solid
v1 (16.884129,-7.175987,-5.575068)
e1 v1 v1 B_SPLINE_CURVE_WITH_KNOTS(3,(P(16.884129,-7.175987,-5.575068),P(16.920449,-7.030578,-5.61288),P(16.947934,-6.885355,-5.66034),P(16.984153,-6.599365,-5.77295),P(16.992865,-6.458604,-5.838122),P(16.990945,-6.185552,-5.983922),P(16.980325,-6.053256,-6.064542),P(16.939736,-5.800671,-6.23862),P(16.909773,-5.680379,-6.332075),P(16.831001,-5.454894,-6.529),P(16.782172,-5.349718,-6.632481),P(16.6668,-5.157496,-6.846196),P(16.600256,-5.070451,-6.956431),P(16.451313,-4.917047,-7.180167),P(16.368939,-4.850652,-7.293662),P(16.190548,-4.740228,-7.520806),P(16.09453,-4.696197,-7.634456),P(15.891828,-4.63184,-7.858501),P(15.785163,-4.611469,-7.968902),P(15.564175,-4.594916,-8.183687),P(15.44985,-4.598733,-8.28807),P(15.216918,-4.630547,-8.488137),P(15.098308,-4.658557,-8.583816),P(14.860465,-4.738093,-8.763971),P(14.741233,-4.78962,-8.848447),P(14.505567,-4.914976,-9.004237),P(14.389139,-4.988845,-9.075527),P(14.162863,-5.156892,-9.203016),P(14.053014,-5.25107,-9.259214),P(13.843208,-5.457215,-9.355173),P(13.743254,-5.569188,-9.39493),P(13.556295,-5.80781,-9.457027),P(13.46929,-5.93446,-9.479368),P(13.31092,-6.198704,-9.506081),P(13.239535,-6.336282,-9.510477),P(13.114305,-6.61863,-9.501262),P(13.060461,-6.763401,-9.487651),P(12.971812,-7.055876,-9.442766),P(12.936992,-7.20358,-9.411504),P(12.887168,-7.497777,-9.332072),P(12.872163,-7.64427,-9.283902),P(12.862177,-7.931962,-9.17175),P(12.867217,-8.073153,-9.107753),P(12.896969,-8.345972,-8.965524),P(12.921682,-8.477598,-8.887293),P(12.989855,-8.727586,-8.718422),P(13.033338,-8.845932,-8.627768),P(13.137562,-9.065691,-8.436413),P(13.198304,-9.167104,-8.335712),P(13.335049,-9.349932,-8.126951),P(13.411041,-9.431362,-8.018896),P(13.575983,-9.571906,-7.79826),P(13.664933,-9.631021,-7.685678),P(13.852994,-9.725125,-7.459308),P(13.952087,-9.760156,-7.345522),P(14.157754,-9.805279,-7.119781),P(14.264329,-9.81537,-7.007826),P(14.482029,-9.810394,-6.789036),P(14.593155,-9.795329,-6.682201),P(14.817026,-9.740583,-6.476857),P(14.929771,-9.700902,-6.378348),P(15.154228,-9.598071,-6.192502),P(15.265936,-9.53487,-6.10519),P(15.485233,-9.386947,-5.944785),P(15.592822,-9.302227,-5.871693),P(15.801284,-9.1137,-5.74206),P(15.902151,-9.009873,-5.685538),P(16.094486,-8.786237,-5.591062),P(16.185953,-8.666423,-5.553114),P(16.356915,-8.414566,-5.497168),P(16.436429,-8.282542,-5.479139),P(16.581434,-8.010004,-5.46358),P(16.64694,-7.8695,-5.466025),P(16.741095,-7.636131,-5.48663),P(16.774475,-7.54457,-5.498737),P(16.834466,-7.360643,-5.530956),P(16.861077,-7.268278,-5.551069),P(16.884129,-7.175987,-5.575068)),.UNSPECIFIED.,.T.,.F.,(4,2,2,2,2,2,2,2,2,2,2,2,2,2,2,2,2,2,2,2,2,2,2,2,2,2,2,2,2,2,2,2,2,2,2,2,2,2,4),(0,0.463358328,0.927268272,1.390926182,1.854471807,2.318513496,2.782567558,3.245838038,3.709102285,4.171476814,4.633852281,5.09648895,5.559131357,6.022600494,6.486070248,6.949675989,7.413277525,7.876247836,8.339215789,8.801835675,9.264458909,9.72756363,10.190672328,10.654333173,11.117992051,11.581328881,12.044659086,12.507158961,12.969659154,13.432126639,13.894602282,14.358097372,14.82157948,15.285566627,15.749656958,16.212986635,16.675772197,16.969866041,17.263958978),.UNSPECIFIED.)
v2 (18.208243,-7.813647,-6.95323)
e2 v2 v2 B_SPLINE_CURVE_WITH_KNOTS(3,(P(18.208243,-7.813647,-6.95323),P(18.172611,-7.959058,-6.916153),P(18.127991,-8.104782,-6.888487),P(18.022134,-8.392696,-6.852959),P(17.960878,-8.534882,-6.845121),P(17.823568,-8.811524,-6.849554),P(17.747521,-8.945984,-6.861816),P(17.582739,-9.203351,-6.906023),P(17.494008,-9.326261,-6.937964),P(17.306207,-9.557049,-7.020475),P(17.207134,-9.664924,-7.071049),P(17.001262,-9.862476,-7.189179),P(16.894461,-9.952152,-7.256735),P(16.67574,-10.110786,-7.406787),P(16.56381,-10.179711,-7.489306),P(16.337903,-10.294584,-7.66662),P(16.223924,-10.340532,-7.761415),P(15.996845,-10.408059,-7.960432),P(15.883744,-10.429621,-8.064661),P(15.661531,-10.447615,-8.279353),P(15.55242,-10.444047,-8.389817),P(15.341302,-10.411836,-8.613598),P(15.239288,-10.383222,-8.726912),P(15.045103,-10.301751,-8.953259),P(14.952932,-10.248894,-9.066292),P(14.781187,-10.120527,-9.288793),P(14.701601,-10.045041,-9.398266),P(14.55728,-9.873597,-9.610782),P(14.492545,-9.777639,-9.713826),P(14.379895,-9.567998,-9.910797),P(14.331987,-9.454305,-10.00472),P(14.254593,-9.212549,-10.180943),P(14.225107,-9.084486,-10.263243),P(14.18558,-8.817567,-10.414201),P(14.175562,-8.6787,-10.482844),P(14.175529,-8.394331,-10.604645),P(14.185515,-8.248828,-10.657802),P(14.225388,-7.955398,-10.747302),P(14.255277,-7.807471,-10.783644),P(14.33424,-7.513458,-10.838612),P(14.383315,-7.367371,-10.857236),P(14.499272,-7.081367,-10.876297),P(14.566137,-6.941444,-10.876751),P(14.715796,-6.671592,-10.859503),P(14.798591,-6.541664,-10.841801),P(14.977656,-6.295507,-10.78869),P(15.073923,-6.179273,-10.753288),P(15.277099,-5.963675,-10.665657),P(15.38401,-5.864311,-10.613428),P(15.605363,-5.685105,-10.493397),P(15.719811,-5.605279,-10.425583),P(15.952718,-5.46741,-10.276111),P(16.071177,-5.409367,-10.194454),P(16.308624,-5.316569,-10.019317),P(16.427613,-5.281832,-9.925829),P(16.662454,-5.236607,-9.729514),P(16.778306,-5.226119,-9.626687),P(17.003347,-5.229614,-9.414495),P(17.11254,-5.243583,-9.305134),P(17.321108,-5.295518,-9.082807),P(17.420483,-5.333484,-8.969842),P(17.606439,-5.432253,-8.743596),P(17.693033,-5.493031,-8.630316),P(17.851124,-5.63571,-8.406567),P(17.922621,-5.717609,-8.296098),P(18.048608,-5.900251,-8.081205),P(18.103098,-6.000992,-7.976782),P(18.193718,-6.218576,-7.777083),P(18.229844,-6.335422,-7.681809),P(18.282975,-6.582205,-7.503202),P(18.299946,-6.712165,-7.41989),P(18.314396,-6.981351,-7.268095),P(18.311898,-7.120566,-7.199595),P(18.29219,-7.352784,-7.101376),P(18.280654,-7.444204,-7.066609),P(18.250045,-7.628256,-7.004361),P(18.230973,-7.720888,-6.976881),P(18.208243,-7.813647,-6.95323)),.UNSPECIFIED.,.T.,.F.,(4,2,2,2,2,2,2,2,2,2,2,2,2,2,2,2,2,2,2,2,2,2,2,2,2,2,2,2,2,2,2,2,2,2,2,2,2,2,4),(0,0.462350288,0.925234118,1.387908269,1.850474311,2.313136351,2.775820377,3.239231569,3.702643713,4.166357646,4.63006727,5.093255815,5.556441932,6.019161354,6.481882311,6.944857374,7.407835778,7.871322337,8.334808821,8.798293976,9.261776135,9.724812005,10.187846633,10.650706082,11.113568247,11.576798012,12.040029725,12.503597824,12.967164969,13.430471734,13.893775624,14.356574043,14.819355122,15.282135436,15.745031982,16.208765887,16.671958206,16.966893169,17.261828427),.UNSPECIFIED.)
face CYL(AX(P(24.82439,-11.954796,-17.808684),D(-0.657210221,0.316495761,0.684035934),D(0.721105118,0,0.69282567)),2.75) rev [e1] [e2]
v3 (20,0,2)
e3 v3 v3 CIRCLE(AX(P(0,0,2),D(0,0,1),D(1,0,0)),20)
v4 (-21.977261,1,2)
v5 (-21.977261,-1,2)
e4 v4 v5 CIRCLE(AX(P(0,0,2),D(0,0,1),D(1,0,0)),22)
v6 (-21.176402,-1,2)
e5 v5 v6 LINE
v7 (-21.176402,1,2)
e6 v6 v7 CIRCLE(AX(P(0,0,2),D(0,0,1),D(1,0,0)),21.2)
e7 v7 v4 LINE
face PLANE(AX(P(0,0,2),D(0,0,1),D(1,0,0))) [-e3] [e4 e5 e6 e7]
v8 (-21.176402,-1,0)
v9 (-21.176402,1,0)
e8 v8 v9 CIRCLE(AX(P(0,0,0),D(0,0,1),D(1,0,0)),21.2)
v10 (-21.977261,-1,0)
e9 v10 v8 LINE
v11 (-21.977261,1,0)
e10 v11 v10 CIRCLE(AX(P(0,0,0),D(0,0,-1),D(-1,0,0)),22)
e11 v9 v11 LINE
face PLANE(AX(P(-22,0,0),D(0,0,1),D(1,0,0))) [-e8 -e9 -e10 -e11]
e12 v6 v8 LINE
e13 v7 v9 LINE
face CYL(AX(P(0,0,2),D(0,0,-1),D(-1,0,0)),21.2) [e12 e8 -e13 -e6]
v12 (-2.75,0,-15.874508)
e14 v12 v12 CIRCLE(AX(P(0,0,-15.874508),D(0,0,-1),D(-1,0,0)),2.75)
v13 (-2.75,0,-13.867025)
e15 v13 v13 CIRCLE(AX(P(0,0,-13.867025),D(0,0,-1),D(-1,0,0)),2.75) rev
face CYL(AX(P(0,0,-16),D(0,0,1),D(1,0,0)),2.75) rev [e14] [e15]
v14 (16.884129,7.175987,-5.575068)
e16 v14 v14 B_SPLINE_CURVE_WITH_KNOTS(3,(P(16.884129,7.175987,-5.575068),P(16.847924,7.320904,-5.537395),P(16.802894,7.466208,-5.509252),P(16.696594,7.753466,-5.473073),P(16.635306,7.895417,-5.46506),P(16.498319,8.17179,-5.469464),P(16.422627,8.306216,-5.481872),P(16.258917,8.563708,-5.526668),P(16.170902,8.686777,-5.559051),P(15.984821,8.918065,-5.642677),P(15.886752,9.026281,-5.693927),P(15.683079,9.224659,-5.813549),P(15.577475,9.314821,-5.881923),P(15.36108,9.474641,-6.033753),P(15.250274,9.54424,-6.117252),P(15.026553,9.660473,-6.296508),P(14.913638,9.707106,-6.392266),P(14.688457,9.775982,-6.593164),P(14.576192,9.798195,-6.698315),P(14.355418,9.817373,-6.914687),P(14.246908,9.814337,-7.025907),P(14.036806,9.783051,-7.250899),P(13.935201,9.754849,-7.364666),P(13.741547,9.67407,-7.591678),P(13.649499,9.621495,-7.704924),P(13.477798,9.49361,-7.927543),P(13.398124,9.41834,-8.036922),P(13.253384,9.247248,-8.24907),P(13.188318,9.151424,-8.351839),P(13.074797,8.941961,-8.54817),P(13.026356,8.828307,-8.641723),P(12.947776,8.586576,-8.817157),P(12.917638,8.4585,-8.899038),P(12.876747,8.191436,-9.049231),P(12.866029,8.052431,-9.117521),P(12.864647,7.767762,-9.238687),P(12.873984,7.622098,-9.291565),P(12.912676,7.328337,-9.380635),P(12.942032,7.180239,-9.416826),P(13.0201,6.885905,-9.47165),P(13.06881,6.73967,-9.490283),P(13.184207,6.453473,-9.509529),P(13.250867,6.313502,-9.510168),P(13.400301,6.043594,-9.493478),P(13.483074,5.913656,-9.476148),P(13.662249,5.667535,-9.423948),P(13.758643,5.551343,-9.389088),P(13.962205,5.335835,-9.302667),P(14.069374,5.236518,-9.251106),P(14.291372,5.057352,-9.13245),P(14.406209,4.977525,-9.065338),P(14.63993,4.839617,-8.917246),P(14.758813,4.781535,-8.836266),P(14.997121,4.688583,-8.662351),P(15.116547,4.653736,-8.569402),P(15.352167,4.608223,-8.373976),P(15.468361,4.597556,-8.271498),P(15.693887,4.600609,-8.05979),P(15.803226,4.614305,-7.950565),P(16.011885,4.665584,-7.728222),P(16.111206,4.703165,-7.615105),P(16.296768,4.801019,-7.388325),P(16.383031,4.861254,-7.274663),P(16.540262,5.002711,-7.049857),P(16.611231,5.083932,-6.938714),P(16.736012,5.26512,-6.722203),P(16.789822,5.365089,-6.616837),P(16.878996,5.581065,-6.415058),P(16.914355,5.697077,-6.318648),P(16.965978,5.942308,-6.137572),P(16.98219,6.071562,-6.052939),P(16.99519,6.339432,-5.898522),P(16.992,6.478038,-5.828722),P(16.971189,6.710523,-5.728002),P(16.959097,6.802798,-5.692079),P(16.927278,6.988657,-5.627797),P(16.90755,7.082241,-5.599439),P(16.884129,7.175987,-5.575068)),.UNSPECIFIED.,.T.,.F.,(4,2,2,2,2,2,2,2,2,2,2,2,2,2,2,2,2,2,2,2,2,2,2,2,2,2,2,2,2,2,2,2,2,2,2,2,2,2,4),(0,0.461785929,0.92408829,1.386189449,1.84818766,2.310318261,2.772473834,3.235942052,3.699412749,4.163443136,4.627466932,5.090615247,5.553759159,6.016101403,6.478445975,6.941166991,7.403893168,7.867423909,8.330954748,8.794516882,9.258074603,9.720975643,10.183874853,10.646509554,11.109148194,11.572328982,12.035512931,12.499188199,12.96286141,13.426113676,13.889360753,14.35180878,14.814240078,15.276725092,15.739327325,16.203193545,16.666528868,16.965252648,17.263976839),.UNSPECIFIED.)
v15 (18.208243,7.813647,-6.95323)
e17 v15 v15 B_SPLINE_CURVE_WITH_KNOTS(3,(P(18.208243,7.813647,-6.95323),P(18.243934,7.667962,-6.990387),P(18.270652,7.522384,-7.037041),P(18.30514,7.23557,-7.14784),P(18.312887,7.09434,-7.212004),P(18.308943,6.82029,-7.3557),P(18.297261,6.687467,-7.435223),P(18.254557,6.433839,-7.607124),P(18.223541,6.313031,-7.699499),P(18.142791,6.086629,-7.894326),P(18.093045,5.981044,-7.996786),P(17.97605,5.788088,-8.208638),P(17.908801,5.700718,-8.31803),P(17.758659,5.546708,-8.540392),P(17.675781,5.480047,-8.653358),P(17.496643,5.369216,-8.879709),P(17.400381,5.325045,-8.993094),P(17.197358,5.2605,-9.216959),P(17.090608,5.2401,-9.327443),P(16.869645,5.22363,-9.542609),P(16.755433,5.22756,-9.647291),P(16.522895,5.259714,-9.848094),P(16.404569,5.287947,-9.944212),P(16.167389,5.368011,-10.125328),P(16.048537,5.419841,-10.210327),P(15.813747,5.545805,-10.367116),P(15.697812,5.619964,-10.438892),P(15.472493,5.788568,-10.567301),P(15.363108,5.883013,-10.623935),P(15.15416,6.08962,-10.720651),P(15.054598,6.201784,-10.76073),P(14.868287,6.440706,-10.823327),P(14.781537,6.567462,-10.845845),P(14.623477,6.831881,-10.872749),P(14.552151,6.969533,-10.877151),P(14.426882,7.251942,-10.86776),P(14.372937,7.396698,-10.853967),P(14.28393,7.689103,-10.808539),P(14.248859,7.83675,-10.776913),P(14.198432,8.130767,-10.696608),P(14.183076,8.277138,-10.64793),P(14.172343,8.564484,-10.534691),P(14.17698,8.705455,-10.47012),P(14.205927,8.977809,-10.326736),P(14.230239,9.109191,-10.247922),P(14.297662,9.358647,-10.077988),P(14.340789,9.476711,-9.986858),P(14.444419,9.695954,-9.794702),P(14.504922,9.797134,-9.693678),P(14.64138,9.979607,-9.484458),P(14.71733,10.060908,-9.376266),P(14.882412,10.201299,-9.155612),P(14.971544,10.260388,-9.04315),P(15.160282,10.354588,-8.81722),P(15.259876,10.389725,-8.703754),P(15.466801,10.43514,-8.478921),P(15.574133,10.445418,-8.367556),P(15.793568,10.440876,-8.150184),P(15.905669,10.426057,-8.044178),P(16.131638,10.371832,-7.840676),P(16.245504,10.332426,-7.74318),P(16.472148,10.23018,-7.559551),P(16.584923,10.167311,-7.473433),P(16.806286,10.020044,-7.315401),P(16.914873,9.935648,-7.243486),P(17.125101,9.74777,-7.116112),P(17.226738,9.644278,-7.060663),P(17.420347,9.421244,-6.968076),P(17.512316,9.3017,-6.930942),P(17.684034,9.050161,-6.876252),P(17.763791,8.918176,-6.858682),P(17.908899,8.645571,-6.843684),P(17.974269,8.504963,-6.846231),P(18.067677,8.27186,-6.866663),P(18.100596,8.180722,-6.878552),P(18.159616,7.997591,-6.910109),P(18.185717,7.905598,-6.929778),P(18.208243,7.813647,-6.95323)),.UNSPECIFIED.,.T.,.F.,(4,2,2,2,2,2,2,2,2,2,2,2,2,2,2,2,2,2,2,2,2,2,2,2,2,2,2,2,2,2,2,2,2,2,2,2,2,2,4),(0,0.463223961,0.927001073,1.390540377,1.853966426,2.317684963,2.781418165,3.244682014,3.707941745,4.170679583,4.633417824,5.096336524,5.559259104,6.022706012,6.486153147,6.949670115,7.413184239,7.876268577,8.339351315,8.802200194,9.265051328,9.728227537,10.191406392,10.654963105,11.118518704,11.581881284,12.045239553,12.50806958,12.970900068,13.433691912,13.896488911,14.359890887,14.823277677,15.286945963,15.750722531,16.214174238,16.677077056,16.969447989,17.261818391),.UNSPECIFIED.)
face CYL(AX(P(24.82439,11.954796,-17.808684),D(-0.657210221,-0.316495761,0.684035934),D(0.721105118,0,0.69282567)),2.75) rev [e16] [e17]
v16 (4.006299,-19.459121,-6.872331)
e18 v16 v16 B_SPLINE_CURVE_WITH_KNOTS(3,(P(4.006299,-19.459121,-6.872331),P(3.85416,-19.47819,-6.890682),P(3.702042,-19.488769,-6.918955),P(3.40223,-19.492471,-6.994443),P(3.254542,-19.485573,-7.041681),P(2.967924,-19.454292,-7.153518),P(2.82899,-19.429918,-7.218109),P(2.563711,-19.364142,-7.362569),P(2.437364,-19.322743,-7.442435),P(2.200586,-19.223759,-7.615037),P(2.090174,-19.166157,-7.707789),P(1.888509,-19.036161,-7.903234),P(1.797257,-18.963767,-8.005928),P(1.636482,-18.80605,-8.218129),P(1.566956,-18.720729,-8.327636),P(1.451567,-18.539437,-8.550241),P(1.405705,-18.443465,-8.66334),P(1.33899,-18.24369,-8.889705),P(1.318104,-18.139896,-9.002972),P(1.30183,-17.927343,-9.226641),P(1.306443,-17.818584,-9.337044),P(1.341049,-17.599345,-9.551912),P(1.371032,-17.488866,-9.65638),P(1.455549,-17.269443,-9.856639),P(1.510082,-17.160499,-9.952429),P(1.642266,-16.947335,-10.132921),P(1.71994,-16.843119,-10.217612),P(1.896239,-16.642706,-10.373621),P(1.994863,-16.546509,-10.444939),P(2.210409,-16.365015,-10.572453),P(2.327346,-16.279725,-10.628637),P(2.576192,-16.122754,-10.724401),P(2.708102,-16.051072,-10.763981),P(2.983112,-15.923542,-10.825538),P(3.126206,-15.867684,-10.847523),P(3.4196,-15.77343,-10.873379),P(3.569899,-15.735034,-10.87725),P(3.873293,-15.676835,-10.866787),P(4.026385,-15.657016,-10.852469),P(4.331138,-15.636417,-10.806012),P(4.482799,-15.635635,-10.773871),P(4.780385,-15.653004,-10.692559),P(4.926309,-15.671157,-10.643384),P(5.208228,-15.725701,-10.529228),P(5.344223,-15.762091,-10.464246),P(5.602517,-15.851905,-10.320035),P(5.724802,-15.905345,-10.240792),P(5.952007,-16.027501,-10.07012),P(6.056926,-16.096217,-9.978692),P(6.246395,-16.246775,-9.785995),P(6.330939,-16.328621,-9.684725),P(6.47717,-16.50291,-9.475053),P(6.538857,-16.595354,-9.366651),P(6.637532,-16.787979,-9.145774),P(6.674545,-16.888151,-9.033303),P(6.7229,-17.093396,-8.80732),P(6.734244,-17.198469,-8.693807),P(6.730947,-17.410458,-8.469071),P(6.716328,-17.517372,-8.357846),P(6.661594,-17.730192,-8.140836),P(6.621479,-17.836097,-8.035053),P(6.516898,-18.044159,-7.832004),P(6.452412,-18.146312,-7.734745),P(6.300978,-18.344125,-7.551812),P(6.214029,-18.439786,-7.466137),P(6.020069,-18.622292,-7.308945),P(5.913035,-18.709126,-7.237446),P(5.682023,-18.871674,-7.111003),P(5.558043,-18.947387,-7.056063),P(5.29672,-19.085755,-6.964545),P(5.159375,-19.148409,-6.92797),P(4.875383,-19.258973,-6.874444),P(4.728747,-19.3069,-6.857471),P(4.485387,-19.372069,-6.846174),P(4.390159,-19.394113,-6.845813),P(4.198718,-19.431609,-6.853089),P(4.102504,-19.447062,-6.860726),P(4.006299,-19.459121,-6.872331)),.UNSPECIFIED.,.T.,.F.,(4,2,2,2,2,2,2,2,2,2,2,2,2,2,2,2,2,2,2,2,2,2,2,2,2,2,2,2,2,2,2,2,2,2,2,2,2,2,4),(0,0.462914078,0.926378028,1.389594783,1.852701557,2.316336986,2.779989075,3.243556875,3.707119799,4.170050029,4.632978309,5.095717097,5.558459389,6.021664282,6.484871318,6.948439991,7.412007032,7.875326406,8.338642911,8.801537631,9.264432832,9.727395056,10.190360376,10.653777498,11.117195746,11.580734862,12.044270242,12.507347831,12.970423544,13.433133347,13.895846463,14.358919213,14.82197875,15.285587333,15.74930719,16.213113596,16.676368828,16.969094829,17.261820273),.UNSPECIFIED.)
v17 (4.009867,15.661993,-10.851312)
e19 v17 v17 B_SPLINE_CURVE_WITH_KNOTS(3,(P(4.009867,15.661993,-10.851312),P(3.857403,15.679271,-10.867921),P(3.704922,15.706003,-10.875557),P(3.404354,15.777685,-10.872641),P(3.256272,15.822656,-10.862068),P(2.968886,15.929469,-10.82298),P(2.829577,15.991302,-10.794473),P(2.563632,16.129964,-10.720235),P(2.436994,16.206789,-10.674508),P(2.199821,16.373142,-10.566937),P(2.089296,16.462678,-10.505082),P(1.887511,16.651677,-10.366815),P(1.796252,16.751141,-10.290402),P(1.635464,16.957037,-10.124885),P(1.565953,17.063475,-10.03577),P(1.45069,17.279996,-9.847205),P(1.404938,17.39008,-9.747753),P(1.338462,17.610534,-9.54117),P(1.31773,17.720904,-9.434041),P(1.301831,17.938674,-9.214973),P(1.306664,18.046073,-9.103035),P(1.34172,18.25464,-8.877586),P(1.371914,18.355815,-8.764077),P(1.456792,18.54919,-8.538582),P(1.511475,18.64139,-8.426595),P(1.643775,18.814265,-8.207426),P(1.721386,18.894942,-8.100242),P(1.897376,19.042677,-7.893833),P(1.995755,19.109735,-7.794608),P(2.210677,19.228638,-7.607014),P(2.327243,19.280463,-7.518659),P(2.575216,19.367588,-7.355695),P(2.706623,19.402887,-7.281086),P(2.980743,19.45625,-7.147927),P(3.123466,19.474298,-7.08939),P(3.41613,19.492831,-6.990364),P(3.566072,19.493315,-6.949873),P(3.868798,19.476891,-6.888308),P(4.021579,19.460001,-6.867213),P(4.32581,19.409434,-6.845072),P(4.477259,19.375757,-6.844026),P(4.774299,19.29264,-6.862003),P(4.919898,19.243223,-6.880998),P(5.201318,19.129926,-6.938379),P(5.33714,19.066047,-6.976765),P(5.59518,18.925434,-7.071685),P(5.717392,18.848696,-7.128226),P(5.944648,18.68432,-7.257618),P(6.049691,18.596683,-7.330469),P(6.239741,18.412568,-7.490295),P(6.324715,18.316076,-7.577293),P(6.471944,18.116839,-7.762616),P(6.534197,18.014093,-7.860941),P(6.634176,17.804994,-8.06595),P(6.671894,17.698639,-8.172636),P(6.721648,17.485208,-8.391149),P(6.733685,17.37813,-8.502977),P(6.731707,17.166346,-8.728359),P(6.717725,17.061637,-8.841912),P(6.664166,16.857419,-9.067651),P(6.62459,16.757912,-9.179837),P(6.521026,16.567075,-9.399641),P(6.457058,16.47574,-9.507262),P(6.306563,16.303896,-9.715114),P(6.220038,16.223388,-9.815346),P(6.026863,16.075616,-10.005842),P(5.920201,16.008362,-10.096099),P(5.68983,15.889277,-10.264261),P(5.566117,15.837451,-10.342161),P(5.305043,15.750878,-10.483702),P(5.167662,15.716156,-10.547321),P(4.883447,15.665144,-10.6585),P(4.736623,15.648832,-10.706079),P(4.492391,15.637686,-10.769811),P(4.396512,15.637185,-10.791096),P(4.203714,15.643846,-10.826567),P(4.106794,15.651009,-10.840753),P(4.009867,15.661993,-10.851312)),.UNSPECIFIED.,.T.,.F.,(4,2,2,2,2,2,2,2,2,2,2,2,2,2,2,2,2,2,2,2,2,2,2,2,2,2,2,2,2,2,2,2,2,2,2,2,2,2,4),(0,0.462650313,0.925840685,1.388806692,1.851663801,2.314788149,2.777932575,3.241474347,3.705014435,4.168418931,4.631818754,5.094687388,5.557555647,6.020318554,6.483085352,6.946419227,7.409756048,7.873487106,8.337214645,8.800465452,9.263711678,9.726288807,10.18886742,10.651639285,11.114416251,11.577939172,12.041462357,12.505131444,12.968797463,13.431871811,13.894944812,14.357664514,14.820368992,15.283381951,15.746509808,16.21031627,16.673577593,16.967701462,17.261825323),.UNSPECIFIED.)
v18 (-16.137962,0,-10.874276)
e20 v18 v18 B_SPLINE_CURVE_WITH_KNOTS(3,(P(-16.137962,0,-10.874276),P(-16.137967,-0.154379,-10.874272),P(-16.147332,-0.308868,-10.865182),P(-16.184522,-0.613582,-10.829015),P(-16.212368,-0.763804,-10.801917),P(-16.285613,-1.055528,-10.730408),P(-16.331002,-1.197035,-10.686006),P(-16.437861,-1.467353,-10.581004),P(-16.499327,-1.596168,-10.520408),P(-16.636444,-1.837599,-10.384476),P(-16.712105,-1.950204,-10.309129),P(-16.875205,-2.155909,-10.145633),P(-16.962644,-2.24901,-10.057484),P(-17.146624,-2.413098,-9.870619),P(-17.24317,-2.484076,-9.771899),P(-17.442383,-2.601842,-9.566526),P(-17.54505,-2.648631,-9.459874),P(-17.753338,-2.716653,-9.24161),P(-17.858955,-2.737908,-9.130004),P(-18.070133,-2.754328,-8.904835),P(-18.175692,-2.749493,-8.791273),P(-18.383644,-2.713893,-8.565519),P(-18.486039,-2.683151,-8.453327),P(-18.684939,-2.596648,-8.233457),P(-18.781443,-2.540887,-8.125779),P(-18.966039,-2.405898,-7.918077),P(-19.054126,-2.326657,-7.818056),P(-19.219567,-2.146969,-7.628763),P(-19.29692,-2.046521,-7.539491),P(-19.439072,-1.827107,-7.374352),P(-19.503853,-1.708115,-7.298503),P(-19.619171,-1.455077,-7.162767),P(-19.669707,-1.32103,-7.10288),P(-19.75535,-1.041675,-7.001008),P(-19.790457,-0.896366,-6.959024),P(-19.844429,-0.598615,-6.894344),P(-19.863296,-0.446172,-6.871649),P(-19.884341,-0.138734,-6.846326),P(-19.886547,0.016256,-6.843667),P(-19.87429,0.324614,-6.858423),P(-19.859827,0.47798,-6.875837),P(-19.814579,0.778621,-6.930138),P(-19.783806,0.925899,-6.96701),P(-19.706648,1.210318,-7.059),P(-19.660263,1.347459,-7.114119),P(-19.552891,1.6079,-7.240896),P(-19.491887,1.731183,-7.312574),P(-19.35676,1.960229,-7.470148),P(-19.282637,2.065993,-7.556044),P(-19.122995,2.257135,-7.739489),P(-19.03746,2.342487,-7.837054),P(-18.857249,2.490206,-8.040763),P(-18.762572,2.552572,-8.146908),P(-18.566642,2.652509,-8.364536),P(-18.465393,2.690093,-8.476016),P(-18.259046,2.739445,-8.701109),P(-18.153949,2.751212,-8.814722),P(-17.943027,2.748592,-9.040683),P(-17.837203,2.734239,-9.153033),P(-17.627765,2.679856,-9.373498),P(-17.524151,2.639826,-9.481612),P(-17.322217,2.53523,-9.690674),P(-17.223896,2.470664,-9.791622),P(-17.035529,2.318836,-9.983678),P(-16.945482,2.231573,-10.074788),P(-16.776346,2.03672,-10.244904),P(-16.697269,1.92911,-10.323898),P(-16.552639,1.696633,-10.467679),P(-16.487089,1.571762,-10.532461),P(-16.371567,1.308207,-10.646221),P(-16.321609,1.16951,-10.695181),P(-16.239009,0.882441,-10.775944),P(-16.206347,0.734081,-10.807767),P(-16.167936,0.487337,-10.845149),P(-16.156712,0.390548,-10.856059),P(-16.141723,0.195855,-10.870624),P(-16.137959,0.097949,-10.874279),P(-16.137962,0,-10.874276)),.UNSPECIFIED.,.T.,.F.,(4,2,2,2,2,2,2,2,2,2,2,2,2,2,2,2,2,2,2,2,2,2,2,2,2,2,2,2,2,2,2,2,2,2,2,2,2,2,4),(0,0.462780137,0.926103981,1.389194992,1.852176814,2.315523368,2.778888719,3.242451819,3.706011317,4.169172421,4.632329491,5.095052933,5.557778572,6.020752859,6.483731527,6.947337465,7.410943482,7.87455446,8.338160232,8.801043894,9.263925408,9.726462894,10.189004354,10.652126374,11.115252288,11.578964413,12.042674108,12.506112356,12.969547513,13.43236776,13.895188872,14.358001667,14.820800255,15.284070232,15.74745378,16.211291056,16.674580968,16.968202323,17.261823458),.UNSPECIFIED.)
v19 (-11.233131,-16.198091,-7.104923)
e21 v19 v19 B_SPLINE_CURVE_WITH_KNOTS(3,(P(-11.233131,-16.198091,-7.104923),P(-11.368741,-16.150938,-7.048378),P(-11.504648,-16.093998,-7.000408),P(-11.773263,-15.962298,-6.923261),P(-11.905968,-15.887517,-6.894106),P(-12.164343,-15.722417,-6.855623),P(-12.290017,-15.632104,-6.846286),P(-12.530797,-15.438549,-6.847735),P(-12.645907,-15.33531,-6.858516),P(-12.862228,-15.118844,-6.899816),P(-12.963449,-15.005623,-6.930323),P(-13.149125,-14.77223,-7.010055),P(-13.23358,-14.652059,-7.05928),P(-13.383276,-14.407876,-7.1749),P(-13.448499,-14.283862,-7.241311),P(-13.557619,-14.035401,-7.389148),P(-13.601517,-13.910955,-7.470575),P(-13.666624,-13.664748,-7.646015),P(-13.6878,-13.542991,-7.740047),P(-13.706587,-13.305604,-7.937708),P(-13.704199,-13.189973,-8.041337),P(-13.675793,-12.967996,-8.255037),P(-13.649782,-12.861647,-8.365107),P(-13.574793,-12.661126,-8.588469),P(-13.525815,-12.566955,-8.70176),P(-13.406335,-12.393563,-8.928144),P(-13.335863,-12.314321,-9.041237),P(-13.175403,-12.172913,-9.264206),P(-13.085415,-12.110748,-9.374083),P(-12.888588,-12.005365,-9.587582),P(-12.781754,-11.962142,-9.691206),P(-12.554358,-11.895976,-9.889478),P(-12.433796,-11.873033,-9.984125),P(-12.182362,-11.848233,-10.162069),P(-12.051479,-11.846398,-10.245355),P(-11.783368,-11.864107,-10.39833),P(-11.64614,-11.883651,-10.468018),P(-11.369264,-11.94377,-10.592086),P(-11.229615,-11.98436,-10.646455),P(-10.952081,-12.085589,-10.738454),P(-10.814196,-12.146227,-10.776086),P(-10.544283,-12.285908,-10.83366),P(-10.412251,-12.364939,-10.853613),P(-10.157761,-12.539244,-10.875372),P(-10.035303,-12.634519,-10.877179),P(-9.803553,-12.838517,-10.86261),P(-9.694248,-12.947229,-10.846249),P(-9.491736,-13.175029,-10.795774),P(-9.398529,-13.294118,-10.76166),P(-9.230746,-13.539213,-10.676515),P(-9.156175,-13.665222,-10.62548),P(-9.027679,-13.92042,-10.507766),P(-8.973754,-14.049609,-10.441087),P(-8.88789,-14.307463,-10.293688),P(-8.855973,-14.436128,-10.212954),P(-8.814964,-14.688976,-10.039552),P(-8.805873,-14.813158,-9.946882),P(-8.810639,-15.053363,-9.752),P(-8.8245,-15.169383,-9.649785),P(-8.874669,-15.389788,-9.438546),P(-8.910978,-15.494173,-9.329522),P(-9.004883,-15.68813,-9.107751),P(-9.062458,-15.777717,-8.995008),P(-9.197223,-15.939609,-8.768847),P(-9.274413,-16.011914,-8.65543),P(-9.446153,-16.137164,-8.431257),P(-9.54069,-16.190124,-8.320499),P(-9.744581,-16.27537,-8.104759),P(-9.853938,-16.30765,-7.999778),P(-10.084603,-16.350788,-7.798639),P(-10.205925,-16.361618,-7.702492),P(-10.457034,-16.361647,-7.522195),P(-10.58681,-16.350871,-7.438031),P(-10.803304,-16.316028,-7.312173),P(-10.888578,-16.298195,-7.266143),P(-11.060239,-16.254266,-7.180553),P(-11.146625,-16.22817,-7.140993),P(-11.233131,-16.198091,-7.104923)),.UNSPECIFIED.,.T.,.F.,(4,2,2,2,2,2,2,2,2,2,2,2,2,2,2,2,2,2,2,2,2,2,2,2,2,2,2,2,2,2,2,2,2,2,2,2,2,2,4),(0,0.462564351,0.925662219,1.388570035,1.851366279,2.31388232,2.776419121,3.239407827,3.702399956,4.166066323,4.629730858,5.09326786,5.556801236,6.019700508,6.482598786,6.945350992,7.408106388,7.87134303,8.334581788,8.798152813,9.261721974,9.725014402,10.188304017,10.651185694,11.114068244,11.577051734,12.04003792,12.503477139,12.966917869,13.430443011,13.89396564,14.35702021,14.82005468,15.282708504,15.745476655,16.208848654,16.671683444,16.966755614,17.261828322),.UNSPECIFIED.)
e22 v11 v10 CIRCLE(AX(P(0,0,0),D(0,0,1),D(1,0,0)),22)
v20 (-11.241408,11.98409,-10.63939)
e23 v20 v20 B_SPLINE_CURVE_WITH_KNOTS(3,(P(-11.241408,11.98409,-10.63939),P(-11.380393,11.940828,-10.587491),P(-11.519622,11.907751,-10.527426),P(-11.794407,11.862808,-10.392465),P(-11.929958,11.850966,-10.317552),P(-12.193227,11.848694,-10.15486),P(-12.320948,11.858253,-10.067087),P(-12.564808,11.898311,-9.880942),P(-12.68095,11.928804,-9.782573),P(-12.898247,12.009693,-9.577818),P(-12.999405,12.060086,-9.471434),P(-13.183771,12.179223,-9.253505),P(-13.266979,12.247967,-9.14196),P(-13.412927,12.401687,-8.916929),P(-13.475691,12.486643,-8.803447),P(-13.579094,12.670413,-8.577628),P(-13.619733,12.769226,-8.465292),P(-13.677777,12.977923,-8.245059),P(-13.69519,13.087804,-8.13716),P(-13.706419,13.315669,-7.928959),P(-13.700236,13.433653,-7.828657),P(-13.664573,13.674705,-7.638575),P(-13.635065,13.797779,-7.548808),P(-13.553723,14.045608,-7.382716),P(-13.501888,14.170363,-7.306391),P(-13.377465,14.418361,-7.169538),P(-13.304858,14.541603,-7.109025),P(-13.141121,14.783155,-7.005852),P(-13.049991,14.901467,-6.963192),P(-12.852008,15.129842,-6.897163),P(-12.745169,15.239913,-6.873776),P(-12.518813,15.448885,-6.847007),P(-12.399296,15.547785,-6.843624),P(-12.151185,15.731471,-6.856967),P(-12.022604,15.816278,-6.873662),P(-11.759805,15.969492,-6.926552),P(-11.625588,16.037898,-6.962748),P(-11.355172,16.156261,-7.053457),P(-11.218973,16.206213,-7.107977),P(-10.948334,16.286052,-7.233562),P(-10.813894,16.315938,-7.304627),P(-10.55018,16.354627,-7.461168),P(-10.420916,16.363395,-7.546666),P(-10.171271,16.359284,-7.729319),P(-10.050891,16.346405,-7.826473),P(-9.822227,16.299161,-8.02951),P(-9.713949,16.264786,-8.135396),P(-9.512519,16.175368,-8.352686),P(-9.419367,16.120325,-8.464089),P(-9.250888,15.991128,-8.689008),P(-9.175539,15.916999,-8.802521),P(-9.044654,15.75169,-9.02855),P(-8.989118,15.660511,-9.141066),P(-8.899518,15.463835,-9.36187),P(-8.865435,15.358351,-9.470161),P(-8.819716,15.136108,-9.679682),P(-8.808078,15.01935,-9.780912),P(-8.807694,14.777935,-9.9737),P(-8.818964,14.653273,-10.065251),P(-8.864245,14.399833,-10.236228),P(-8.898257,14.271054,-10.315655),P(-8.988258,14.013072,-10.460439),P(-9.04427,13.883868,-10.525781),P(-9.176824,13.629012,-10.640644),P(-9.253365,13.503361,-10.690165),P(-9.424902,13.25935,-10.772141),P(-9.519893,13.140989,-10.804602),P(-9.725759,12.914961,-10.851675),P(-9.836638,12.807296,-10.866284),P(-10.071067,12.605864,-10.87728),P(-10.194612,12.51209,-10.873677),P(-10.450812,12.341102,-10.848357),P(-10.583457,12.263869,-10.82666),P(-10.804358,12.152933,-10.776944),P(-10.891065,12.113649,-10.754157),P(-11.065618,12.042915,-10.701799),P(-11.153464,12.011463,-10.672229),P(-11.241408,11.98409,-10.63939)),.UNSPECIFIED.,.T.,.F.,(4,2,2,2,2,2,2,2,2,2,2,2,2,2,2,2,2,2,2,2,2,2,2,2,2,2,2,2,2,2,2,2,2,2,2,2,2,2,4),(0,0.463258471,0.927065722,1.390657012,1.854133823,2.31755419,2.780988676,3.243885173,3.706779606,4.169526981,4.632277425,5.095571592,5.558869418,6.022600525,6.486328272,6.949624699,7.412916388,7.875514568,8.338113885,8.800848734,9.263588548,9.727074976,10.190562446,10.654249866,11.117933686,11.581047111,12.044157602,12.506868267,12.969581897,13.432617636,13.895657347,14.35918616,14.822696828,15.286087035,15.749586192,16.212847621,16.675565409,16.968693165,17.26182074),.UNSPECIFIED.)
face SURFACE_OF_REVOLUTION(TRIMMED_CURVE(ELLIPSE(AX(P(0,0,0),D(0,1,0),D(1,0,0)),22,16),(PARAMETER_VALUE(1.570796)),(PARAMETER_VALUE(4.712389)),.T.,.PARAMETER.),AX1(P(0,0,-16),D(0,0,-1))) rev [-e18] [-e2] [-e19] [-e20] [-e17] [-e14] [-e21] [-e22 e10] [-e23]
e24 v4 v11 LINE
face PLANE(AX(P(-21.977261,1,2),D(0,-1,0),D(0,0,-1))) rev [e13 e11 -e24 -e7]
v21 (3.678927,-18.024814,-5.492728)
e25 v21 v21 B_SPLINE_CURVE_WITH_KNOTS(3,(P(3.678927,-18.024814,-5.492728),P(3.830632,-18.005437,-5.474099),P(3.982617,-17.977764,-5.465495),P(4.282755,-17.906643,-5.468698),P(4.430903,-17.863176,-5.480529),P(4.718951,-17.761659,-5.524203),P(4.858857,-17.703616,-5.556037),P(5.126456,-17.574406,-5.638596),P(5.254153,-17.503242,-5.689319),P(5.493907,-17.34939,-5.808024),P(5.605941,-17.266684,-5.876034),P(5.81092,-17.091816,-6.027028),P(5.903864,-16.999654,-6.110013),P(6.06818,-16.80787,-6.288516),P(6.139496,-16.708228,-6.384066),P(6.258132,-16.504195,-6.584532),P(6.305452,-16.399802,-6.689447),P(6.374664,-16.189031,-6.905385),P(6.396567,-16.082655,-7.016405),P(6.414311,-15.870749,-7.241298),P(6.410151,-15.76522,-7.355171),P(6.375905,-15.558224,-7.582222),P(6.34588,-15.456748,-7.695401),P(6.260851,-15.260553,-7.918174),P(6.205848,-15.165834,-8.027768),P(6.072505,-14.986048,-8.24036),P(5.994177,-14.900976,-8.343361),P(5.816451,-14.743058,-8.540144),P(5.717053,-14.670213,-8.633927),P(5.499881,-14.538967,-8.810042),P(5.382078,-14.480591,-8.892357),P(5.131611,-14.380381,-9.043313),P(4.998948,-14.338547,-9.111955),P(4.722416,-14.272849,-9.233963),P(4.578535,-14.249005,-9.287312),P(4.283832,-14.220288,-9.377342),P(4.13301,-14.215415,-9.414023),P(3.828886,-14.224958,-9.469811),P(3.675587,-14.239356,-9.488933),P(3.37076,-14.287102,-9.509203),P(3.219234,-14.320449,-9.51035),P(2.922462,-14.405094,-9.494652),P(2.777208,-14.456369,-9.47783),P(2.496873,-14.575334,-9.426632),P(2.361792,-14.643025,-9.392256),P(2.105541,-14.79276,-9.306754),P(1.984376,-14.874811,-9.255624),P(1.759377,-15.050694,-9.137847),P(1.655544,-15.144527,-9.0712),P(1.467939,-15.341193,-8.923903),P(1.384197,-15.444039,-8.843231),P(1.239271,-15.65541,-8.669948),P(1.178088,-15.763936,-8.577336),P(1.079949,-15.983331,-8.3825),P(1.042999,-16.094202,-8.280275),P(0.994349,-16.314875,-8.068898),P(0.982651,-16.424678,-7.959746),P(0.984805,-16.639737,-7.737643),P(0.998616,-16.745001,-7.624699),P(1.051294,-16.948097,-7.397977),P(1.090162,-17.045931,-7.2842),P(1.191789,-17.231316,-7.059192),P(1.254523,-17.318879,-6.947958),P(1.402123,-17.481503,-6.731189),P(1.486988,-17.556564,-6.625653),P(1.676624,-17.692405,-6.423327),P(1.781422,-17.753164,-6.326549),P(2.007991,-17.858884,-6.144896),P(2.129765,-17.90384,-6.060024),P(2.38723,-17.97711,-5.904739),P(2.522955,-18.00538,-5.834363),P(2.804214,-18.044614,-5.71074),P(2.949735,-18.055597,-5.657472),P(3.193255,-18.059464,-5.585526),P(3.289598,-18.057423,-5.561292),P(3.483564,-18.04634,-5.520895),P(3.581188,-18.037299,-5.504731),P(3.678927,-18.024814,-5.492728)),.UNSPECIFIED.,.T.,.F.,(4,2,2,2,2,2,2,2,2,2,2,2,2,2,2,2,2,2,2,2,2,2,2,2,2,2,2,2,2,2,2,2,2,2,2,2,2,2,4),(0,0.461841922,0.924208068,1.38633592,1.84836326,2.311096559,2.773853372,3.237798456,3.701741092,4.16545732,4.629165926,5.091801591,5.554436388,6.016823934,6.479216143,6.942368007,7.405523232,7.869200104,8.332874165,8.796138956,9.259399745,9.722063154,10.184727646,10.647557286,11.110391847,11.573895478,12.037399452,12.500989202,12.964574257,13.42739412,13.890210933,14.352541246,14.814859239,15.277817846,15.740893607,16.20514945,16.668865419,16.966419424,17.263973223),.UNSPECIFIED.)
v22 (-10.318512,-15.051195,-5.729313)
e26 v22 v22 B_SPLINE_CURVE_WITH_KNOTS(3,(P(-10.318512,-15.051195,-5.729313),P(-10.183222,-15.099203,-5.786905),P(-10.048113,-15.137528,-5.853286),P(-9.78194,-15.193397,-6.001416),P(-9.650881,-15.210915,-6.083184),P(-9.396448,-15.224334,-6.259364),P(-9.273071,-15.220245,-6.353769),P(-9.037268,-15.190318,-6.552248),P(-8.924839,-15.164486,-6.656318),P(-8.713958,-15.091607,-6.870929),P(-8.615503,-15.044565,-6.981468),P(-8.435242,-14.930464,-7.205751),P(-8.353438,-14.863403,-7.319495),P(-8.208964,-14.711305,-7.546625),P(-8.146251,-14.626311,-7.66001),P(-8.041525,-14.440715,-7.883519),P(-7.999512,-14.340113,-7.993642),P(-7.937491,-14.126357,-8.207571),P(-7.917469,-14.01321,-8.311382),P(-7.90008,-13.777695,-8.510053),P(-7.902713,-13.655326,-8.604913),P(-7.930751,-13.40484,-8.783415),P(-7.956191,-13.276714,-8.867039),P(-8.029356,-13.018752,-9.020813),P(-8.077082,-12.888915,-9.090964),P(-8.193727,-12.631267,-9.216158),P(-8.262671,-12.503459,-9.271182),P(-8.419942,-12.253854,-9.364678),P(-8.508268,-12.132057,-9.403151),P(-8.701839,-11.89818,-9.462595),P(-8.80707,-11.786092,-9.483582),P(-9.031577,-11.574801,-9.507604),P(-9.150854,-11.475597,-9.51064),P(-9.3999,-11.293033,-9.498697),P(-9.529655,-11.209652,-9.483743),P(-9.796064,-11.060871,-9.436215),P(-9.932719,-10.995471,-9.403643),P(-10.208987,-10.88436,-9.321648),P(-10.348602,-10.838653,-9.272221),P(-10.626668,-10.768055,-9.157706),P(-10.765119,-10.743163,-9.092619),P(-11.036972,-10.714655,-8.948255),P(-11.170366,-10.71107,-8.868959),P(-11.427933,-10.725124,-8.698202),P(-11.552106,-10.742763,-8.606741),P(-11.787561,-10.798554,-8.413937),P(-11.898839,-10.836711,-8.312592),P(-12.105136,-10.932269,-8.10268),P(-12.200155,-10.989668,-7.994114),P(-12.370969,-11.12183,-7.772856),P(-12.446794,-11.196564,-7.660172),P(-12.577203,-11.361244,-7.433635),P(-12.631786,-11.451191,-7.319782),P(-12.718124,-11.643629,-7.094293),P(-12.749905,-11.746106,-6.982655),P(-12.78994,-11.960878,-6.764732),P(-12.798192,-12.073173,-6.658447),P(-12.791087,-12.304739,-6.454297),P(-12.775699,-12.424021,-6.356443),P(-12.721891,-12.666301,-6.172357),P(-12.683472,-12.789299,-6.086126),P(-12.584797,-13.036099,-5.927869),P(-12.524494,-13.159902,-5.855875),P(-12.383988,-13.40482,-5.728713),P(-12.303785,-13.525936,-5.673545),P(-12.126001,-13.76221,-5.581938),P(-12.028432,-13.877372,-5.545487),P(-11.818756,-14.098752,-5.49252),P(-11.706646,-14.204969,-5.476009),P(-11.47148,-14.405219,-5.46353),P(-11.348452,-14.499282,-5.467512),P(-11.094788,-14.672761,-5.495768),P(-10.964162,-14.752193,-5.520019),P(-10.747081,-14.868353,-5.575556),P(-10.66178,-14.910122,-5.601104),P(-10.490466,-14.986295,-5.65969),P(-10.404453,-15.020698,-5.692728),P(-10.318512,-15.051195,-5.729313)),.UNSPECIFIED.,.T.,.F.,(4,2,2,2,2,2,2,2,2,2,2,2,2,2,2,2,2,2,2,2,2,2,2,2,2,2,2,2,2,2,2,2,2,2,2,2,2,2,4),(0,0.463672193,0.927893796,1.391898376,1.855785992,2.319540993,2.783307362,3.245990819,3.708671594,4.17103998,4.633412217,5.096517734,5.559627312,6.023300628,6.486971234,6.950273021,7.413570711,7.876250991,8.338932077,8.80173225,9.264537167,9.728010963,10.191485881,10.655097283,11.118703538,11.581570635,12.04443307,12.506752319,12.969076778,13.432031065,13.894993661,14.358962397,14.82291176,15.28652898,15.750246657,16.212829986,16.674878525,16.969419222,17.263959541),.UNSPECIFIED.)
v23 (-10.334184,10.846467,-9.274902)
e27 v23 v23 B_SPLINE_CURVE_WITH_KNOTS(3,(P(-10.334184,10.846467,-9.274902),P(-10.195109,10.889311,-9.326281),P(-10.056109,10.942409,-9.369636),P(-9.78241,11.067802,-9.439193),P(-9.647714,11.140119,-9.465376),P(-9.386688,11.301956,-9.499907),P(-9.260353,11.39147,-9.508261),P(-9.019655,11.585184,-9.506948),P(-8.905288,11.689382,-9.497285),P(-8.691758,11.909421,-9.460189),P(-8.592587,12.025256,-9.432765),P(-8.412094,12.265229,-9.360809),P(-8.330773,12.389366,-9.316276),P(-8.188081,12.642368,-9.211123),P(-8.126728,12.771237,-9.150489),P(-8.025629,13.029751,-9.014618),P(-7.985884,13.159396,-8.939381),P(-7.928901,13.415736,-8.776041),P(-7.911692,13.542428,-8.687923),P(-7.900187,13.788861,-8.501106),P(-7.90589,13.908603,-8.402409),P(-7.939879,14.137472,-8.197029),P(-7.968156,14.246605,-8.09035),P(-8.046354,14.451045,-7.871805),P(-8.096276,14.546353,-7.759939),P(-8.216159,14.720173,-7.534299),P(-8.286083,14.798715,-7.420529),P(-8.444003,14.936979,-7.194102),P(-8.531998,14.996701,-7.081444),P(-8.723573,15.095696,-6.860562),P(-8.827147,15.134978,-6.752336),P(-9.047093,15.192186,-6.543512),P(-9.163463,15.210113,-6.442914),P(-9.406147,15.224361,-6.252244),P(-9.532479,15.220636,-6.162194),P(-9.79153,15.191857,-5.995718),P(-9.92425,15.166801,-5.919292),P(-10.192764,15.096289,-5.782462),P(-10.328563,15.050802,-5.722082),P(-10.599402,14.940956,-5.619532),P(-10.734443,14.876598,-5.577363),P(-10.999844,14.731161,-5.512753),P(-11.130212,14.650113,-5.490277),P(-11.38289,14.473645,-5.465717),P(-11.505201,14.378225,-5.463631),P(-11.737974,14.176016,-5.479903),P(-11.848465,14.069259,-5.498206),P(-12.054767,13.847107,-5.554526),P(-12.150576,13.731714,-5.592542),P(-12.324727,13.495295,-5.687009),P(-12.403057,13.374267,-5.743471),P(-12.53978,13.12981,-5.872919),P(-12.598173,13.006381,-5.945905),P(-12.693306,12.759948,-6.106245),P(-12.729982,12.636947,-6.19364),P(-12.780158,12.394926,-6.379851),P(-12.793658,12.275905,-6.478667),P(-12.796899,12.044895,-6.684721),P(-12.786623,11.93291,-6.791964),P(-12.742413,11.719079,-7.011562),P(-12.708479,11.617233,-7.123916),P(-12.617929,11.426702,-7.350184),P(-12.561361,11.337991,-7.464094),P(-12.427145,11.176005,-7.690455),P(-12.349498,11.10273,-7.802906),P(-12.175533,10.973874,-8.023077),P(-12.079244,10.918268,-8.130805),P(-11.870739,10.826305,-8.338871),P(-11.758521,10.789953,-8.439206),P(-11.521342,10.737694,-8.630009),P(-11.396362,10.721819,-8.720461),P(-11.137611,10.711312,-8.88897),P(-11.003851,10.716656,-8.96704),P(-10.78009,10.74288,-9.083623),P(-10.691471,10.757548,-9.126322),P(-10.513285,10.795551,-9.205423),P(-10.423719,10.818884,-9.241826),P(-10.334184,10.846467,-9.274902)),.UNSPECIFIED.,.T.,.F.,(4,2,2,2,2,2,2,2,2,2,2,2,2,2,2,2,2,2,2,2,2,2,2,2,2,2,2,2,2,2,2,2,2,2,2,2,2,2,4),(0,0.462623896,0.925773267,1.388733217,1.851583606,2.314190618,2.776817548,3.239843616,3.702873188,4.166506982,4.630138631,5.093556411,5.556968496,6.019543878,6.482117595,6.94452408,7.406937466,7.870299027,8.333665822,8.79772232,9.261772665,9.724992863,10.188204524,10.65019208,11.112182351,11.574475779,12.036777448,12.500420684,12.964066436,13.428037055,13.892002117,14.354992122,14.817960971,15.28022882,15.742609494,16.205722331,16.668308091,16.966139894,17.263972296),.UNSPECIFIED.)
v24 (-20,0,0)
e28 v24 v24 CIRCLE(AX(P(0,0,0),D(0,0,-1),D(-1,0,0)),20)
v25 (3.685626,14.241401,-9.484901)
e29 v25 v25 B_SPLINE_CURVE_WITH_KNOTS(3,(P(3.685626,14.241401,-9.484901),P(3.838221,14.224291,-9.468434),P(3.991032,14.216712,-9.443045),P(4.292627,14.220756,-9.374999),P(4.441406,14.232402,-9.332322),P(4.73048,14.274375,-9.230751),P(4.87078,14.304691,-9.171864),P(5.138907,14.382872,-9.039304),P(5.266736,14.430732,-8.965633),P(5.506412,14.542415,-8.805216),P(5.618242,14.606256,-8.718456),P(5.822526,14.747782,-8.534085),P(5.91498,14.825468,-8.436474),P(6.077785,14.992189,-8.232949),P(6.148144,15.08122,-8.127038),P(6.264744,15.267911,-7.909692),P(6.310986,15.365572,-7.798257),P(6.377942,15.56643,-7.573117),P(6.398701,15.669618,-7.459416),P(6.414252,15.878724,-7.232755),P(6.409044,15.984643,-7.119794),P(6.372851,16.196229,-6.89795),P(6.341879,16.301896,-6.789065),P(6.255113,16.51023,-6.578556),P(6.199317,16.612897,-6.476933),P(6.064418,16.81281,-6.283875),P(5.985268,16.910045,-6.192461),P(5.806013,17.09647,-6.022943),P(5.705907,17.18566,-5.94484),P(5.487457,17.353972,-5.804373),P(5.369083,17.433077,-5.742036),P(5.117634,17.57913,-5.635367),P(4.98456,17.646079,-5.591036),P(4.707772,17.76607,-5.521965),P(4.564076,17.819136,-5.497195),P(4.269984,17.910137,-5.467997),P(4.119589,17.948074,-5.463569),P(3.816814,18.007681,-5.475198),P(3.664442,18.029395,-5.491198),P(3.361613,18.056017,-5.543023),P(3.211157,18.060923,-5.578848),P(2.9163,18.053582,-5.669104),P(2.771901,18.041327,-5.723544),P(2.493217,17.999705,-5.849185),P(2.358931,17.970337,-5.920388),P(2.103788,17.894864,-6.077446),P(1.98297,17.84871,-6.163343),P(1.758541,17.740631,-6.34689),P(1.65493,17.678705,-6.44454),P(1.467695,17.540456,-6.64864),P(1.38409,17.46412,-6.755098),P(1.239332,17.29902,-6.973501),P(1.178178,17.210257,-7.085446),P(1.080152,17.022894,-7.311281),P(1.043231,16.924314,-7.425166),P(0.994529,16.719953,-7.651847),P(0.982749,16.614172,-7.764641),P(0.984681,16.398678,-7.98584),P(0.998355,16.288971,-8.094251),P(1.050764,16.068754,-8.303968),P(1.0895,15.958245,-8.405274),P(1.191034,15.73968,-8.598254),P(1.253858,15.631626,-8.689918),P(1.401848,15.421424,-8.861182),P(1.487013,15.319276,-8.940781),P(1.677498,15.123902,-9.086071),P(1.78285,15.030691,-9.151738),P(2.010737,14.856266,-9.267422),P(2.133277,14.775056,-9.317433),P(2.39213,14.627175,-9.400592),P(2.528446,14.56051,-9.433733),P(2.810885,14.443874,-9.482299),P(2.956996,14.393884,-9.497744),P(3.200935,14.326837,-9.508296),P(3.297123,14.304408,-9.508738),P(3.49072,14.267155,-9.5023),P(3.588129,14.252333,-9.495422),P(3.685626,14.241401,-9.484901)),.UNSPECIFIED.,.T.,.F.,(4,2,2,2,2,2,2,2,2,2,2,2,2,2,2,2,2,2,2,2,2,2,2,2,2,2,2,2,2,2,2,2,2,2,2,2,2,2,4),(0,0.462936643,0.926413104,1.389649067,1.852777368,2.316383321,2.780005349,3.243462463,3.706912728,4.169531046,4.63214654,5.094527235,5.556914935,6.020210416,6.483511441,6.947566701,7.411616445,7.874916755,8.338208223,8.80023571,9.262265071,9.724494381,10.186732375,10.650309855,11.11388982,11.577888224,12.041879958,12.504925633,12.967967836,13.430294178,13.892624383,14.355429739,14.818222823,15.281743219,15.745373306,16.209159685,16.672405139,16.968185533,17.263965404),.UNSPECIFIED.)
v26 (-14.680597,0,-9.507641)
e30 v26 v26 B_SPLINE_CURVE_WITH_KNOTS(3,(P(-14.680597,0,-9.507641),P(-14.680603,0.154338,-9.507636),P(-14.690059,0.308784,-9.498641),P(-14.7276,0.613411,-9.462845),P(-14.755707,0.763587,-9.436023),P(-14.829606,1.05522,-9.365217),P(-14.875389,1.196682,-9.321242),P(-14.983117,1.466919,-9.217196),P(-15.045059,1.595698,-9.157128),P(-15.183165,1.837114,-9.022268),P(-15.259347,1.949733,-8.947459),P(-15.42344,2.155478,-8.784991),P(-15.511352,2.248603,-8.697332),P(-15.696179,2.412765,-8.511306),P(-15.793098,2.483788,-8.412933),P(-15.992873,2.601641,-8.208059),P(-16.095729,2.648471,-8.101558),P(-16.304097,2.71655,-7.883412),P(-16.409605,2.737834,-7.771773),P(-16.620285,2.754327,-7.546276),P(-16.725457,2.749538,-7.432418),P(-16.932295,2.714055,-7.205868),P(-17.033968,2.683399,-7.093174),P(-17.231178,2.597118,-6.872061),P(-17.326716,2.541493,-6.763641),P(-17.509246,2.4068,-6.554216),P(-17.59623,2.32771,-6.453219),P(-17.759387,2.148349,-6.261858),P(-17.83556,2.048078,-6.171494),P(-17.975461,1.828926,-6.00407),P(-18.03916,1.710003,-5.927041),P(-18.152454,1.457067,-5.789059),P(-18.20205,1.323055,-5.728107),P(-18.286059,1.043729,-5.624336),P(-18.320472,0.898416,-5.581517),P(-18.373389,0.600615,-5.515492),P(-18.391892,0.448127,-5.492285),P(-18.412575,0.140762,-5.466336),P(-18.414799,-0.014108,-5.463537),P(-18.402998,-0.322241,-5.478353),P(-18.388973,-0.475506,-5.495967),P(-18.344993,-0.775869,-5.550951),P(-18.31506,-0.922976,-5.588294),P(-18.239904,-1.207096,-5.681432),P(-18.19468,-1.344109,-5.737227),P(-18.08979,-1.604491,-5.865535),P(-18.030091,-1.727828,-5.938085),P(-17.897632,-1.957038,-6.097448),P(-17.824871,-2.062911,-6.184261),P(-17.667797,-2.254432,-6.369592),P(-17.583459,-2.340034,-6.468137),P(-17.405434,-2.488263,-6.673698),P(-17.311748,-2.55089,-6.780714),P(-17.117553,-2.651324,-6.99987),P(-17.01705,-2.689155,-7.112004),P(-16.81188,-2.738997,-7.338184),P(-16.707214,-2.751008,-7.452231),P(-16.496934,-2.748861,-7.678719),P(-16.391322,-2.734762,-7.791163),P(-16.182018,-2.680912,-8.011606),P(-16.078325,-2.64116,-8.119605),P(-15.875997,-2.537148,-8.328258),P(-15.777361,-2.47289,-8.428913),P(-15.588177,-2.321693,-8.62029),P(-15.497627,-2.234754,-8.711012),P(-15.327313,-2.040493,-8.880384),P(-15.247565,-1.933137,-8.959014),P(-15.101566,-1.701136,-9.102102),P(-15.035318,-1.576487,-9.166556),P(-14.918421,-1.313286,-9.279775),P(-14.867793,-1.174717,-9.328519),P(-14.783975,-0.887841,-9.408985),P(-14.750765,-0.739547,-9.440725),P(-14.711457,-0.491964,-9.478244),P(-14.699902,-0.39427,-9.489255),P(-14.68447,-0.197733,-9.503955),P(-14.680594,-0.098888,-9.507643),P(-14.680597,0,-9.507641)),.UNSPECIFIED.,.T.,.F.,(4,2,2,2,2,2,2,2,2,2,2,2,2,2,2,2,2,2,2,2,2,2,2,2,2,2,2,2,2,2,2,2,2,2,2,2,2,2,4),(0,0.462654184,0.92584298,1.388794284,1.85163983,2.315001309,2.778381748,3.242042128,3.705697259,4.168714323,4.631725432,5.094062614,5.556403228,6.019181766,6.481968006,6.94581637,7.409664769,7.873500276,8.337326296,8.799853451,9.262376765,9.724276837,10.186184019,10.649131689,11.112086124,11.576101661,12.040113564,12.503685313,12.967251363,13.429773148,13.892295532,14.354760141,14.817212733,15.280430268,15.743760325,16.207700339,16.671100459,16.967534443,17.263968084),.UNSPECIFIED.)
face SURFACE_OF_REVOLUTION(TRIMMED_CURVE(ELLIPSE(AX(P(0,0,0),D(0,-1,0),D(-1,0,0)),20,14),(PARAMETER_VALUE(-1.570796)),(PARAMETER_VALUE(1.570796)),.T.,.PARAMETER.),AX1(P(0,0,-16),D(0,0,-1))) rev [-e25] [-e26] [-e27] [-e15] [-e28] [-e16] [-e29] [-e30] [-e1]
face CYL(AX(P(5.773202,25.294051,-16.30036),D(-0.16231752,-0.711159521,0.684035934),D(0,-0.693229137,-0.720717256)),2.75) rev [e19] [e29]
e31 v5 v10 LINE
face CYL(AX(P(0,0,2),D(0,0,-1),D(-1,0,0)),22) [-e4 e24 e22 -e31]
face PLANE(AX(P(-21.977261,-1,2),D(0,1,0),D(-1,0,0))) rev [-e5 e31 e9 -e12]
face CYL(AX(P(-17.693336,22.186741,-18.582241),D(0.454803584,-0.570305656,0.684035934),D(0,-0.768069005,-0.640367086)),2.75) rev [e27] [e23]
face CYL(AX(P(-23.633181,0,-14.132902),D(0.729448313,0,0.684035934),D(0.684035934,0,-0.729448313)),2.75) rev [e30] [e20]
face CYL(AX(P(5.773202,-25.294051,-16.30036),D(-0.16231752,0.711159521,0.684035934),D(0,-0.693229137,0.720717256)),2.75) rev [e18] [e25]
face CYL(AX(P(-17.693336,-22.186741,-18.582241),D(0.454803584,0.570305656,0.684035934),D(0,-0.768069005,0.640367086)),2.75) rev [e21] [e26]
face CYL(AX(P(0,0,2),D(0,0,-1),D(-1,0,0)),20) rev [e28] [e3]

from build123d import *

# Parameters (mm, degrees)
SKETCH_2_R                = 2.75
CUT_EXTRUDE_2_DEPTH       = 35.985711541
PATTERN_START             = -20
PATTERN_CURVE_1_OUTLINE_R = 2.75
PATTERN_CURVE_1_DEPTH     = 4
PATTERN_CIRCULAR_28_COUNT = 7
SKETCH_24_R               = 20
EXTRUDE_7_DEPTH           = 2


with BuildPart() as part:
    # 草图1 → 旋转1 (revolve)
    with BuildSketch(Plane(origin=(0, 0, 0), x_dir=(1, 0, 0), z_dir=(0, 1, 0))):
        with BuildLine():
            Line((-22, 0), (-20, 0))
            add(Edge.make_bspline(
                [(0, 14), (-20, 14), (-20, 0)],
                knots=[1.570796327, 1.570796327, 1.570796327, 3.141592654, 3.141592654, 3.141592654], degree=2, weights=[1, 0.707106781, 1]))
            Line((0, 14), (0, 16))
            add(Edge.make_bspline(
                [(0, 16), (-22, 16), (-22, 0)],
                knots=[1.570796327, 1.570796327, 1.570796327, 3.141592654, 3.141592654, 3.141592654], degree=2, weights=[1, 0.707106781, 1]))
        make_face()
    revolve(axis=Axis((0, 0, -16), (0, 0, 1)))

    # 草图2 → 切除-拉伸2 (cut, through all)
    with BuildSketch(Plane.XY):
        with Locations(Location((0, 0, 0), (0, 0, 180))):
            Circle(SKETCH_2_R)
    extrude(amount=-CUT_EXTRUDE_2_DEPTH, mode=Mode.SUBTRACT)

    # 曲线阵列1: read off the stored shape, not the designer's step
    # 曲线阵列1 outline → 曲线阵列1 (cut)
    with BuildSketch(Plane(origin=(0, 0, 0), x_dir=(0.6840359338597551, 0, -0.7294483128972282), z_dir=(0.7294483128972282, 0, 0.6840359338597553)).offset(PATTERN_START)):
        with Locations((-5.856723788, 0)):
            Circle(PATTERN_CURVE_1_OUTLINE_R)
    pattern_curve_1 = extrude(amount=PATTERN_CURVE_1_DEPTH, mode=Mode.SUBTRACT)

    # 阵列(圆周)28: 曲线阵列1 ×7 about axis
    pattern_circular_28_axis = Axis((0, 0, -21.563563878), (0, 0, 1))
    for i in range(1, PATTERN_CIRCULAR_28_COUNT):
        add(pattern_curve_1.rotate(pattern_circular_28_axis, i * 360 / PATTERN_CIRCULAR_28_COUNT), mode=Mode.SUBTRACT)

    # 草图24 → 凸台-拉伸7 (add)
    with BuildSketch(Plane.XY):
        with BuildLine():
            Line((-21.977260976, 1), (-21.176401961, 1))
            ThreePointArc((-21.176401961, 1), (21.2, 0), (-21.176401961, -1))
            Line((-21.176401961, -1), (-21.977260976, -1))
            ThreePointArc((-21.977260976, -1), (-22, 0), (-21.977260976, 1))
        make_face()
        with Locations(Location((0, 0, 0), (0, 0, 180))):
            Circle(SKETCH_24_R, mode=Mode.SUBTRACT)
    extrude(amount=EXTRUDE_7_DEPTH)


solid = part.part
